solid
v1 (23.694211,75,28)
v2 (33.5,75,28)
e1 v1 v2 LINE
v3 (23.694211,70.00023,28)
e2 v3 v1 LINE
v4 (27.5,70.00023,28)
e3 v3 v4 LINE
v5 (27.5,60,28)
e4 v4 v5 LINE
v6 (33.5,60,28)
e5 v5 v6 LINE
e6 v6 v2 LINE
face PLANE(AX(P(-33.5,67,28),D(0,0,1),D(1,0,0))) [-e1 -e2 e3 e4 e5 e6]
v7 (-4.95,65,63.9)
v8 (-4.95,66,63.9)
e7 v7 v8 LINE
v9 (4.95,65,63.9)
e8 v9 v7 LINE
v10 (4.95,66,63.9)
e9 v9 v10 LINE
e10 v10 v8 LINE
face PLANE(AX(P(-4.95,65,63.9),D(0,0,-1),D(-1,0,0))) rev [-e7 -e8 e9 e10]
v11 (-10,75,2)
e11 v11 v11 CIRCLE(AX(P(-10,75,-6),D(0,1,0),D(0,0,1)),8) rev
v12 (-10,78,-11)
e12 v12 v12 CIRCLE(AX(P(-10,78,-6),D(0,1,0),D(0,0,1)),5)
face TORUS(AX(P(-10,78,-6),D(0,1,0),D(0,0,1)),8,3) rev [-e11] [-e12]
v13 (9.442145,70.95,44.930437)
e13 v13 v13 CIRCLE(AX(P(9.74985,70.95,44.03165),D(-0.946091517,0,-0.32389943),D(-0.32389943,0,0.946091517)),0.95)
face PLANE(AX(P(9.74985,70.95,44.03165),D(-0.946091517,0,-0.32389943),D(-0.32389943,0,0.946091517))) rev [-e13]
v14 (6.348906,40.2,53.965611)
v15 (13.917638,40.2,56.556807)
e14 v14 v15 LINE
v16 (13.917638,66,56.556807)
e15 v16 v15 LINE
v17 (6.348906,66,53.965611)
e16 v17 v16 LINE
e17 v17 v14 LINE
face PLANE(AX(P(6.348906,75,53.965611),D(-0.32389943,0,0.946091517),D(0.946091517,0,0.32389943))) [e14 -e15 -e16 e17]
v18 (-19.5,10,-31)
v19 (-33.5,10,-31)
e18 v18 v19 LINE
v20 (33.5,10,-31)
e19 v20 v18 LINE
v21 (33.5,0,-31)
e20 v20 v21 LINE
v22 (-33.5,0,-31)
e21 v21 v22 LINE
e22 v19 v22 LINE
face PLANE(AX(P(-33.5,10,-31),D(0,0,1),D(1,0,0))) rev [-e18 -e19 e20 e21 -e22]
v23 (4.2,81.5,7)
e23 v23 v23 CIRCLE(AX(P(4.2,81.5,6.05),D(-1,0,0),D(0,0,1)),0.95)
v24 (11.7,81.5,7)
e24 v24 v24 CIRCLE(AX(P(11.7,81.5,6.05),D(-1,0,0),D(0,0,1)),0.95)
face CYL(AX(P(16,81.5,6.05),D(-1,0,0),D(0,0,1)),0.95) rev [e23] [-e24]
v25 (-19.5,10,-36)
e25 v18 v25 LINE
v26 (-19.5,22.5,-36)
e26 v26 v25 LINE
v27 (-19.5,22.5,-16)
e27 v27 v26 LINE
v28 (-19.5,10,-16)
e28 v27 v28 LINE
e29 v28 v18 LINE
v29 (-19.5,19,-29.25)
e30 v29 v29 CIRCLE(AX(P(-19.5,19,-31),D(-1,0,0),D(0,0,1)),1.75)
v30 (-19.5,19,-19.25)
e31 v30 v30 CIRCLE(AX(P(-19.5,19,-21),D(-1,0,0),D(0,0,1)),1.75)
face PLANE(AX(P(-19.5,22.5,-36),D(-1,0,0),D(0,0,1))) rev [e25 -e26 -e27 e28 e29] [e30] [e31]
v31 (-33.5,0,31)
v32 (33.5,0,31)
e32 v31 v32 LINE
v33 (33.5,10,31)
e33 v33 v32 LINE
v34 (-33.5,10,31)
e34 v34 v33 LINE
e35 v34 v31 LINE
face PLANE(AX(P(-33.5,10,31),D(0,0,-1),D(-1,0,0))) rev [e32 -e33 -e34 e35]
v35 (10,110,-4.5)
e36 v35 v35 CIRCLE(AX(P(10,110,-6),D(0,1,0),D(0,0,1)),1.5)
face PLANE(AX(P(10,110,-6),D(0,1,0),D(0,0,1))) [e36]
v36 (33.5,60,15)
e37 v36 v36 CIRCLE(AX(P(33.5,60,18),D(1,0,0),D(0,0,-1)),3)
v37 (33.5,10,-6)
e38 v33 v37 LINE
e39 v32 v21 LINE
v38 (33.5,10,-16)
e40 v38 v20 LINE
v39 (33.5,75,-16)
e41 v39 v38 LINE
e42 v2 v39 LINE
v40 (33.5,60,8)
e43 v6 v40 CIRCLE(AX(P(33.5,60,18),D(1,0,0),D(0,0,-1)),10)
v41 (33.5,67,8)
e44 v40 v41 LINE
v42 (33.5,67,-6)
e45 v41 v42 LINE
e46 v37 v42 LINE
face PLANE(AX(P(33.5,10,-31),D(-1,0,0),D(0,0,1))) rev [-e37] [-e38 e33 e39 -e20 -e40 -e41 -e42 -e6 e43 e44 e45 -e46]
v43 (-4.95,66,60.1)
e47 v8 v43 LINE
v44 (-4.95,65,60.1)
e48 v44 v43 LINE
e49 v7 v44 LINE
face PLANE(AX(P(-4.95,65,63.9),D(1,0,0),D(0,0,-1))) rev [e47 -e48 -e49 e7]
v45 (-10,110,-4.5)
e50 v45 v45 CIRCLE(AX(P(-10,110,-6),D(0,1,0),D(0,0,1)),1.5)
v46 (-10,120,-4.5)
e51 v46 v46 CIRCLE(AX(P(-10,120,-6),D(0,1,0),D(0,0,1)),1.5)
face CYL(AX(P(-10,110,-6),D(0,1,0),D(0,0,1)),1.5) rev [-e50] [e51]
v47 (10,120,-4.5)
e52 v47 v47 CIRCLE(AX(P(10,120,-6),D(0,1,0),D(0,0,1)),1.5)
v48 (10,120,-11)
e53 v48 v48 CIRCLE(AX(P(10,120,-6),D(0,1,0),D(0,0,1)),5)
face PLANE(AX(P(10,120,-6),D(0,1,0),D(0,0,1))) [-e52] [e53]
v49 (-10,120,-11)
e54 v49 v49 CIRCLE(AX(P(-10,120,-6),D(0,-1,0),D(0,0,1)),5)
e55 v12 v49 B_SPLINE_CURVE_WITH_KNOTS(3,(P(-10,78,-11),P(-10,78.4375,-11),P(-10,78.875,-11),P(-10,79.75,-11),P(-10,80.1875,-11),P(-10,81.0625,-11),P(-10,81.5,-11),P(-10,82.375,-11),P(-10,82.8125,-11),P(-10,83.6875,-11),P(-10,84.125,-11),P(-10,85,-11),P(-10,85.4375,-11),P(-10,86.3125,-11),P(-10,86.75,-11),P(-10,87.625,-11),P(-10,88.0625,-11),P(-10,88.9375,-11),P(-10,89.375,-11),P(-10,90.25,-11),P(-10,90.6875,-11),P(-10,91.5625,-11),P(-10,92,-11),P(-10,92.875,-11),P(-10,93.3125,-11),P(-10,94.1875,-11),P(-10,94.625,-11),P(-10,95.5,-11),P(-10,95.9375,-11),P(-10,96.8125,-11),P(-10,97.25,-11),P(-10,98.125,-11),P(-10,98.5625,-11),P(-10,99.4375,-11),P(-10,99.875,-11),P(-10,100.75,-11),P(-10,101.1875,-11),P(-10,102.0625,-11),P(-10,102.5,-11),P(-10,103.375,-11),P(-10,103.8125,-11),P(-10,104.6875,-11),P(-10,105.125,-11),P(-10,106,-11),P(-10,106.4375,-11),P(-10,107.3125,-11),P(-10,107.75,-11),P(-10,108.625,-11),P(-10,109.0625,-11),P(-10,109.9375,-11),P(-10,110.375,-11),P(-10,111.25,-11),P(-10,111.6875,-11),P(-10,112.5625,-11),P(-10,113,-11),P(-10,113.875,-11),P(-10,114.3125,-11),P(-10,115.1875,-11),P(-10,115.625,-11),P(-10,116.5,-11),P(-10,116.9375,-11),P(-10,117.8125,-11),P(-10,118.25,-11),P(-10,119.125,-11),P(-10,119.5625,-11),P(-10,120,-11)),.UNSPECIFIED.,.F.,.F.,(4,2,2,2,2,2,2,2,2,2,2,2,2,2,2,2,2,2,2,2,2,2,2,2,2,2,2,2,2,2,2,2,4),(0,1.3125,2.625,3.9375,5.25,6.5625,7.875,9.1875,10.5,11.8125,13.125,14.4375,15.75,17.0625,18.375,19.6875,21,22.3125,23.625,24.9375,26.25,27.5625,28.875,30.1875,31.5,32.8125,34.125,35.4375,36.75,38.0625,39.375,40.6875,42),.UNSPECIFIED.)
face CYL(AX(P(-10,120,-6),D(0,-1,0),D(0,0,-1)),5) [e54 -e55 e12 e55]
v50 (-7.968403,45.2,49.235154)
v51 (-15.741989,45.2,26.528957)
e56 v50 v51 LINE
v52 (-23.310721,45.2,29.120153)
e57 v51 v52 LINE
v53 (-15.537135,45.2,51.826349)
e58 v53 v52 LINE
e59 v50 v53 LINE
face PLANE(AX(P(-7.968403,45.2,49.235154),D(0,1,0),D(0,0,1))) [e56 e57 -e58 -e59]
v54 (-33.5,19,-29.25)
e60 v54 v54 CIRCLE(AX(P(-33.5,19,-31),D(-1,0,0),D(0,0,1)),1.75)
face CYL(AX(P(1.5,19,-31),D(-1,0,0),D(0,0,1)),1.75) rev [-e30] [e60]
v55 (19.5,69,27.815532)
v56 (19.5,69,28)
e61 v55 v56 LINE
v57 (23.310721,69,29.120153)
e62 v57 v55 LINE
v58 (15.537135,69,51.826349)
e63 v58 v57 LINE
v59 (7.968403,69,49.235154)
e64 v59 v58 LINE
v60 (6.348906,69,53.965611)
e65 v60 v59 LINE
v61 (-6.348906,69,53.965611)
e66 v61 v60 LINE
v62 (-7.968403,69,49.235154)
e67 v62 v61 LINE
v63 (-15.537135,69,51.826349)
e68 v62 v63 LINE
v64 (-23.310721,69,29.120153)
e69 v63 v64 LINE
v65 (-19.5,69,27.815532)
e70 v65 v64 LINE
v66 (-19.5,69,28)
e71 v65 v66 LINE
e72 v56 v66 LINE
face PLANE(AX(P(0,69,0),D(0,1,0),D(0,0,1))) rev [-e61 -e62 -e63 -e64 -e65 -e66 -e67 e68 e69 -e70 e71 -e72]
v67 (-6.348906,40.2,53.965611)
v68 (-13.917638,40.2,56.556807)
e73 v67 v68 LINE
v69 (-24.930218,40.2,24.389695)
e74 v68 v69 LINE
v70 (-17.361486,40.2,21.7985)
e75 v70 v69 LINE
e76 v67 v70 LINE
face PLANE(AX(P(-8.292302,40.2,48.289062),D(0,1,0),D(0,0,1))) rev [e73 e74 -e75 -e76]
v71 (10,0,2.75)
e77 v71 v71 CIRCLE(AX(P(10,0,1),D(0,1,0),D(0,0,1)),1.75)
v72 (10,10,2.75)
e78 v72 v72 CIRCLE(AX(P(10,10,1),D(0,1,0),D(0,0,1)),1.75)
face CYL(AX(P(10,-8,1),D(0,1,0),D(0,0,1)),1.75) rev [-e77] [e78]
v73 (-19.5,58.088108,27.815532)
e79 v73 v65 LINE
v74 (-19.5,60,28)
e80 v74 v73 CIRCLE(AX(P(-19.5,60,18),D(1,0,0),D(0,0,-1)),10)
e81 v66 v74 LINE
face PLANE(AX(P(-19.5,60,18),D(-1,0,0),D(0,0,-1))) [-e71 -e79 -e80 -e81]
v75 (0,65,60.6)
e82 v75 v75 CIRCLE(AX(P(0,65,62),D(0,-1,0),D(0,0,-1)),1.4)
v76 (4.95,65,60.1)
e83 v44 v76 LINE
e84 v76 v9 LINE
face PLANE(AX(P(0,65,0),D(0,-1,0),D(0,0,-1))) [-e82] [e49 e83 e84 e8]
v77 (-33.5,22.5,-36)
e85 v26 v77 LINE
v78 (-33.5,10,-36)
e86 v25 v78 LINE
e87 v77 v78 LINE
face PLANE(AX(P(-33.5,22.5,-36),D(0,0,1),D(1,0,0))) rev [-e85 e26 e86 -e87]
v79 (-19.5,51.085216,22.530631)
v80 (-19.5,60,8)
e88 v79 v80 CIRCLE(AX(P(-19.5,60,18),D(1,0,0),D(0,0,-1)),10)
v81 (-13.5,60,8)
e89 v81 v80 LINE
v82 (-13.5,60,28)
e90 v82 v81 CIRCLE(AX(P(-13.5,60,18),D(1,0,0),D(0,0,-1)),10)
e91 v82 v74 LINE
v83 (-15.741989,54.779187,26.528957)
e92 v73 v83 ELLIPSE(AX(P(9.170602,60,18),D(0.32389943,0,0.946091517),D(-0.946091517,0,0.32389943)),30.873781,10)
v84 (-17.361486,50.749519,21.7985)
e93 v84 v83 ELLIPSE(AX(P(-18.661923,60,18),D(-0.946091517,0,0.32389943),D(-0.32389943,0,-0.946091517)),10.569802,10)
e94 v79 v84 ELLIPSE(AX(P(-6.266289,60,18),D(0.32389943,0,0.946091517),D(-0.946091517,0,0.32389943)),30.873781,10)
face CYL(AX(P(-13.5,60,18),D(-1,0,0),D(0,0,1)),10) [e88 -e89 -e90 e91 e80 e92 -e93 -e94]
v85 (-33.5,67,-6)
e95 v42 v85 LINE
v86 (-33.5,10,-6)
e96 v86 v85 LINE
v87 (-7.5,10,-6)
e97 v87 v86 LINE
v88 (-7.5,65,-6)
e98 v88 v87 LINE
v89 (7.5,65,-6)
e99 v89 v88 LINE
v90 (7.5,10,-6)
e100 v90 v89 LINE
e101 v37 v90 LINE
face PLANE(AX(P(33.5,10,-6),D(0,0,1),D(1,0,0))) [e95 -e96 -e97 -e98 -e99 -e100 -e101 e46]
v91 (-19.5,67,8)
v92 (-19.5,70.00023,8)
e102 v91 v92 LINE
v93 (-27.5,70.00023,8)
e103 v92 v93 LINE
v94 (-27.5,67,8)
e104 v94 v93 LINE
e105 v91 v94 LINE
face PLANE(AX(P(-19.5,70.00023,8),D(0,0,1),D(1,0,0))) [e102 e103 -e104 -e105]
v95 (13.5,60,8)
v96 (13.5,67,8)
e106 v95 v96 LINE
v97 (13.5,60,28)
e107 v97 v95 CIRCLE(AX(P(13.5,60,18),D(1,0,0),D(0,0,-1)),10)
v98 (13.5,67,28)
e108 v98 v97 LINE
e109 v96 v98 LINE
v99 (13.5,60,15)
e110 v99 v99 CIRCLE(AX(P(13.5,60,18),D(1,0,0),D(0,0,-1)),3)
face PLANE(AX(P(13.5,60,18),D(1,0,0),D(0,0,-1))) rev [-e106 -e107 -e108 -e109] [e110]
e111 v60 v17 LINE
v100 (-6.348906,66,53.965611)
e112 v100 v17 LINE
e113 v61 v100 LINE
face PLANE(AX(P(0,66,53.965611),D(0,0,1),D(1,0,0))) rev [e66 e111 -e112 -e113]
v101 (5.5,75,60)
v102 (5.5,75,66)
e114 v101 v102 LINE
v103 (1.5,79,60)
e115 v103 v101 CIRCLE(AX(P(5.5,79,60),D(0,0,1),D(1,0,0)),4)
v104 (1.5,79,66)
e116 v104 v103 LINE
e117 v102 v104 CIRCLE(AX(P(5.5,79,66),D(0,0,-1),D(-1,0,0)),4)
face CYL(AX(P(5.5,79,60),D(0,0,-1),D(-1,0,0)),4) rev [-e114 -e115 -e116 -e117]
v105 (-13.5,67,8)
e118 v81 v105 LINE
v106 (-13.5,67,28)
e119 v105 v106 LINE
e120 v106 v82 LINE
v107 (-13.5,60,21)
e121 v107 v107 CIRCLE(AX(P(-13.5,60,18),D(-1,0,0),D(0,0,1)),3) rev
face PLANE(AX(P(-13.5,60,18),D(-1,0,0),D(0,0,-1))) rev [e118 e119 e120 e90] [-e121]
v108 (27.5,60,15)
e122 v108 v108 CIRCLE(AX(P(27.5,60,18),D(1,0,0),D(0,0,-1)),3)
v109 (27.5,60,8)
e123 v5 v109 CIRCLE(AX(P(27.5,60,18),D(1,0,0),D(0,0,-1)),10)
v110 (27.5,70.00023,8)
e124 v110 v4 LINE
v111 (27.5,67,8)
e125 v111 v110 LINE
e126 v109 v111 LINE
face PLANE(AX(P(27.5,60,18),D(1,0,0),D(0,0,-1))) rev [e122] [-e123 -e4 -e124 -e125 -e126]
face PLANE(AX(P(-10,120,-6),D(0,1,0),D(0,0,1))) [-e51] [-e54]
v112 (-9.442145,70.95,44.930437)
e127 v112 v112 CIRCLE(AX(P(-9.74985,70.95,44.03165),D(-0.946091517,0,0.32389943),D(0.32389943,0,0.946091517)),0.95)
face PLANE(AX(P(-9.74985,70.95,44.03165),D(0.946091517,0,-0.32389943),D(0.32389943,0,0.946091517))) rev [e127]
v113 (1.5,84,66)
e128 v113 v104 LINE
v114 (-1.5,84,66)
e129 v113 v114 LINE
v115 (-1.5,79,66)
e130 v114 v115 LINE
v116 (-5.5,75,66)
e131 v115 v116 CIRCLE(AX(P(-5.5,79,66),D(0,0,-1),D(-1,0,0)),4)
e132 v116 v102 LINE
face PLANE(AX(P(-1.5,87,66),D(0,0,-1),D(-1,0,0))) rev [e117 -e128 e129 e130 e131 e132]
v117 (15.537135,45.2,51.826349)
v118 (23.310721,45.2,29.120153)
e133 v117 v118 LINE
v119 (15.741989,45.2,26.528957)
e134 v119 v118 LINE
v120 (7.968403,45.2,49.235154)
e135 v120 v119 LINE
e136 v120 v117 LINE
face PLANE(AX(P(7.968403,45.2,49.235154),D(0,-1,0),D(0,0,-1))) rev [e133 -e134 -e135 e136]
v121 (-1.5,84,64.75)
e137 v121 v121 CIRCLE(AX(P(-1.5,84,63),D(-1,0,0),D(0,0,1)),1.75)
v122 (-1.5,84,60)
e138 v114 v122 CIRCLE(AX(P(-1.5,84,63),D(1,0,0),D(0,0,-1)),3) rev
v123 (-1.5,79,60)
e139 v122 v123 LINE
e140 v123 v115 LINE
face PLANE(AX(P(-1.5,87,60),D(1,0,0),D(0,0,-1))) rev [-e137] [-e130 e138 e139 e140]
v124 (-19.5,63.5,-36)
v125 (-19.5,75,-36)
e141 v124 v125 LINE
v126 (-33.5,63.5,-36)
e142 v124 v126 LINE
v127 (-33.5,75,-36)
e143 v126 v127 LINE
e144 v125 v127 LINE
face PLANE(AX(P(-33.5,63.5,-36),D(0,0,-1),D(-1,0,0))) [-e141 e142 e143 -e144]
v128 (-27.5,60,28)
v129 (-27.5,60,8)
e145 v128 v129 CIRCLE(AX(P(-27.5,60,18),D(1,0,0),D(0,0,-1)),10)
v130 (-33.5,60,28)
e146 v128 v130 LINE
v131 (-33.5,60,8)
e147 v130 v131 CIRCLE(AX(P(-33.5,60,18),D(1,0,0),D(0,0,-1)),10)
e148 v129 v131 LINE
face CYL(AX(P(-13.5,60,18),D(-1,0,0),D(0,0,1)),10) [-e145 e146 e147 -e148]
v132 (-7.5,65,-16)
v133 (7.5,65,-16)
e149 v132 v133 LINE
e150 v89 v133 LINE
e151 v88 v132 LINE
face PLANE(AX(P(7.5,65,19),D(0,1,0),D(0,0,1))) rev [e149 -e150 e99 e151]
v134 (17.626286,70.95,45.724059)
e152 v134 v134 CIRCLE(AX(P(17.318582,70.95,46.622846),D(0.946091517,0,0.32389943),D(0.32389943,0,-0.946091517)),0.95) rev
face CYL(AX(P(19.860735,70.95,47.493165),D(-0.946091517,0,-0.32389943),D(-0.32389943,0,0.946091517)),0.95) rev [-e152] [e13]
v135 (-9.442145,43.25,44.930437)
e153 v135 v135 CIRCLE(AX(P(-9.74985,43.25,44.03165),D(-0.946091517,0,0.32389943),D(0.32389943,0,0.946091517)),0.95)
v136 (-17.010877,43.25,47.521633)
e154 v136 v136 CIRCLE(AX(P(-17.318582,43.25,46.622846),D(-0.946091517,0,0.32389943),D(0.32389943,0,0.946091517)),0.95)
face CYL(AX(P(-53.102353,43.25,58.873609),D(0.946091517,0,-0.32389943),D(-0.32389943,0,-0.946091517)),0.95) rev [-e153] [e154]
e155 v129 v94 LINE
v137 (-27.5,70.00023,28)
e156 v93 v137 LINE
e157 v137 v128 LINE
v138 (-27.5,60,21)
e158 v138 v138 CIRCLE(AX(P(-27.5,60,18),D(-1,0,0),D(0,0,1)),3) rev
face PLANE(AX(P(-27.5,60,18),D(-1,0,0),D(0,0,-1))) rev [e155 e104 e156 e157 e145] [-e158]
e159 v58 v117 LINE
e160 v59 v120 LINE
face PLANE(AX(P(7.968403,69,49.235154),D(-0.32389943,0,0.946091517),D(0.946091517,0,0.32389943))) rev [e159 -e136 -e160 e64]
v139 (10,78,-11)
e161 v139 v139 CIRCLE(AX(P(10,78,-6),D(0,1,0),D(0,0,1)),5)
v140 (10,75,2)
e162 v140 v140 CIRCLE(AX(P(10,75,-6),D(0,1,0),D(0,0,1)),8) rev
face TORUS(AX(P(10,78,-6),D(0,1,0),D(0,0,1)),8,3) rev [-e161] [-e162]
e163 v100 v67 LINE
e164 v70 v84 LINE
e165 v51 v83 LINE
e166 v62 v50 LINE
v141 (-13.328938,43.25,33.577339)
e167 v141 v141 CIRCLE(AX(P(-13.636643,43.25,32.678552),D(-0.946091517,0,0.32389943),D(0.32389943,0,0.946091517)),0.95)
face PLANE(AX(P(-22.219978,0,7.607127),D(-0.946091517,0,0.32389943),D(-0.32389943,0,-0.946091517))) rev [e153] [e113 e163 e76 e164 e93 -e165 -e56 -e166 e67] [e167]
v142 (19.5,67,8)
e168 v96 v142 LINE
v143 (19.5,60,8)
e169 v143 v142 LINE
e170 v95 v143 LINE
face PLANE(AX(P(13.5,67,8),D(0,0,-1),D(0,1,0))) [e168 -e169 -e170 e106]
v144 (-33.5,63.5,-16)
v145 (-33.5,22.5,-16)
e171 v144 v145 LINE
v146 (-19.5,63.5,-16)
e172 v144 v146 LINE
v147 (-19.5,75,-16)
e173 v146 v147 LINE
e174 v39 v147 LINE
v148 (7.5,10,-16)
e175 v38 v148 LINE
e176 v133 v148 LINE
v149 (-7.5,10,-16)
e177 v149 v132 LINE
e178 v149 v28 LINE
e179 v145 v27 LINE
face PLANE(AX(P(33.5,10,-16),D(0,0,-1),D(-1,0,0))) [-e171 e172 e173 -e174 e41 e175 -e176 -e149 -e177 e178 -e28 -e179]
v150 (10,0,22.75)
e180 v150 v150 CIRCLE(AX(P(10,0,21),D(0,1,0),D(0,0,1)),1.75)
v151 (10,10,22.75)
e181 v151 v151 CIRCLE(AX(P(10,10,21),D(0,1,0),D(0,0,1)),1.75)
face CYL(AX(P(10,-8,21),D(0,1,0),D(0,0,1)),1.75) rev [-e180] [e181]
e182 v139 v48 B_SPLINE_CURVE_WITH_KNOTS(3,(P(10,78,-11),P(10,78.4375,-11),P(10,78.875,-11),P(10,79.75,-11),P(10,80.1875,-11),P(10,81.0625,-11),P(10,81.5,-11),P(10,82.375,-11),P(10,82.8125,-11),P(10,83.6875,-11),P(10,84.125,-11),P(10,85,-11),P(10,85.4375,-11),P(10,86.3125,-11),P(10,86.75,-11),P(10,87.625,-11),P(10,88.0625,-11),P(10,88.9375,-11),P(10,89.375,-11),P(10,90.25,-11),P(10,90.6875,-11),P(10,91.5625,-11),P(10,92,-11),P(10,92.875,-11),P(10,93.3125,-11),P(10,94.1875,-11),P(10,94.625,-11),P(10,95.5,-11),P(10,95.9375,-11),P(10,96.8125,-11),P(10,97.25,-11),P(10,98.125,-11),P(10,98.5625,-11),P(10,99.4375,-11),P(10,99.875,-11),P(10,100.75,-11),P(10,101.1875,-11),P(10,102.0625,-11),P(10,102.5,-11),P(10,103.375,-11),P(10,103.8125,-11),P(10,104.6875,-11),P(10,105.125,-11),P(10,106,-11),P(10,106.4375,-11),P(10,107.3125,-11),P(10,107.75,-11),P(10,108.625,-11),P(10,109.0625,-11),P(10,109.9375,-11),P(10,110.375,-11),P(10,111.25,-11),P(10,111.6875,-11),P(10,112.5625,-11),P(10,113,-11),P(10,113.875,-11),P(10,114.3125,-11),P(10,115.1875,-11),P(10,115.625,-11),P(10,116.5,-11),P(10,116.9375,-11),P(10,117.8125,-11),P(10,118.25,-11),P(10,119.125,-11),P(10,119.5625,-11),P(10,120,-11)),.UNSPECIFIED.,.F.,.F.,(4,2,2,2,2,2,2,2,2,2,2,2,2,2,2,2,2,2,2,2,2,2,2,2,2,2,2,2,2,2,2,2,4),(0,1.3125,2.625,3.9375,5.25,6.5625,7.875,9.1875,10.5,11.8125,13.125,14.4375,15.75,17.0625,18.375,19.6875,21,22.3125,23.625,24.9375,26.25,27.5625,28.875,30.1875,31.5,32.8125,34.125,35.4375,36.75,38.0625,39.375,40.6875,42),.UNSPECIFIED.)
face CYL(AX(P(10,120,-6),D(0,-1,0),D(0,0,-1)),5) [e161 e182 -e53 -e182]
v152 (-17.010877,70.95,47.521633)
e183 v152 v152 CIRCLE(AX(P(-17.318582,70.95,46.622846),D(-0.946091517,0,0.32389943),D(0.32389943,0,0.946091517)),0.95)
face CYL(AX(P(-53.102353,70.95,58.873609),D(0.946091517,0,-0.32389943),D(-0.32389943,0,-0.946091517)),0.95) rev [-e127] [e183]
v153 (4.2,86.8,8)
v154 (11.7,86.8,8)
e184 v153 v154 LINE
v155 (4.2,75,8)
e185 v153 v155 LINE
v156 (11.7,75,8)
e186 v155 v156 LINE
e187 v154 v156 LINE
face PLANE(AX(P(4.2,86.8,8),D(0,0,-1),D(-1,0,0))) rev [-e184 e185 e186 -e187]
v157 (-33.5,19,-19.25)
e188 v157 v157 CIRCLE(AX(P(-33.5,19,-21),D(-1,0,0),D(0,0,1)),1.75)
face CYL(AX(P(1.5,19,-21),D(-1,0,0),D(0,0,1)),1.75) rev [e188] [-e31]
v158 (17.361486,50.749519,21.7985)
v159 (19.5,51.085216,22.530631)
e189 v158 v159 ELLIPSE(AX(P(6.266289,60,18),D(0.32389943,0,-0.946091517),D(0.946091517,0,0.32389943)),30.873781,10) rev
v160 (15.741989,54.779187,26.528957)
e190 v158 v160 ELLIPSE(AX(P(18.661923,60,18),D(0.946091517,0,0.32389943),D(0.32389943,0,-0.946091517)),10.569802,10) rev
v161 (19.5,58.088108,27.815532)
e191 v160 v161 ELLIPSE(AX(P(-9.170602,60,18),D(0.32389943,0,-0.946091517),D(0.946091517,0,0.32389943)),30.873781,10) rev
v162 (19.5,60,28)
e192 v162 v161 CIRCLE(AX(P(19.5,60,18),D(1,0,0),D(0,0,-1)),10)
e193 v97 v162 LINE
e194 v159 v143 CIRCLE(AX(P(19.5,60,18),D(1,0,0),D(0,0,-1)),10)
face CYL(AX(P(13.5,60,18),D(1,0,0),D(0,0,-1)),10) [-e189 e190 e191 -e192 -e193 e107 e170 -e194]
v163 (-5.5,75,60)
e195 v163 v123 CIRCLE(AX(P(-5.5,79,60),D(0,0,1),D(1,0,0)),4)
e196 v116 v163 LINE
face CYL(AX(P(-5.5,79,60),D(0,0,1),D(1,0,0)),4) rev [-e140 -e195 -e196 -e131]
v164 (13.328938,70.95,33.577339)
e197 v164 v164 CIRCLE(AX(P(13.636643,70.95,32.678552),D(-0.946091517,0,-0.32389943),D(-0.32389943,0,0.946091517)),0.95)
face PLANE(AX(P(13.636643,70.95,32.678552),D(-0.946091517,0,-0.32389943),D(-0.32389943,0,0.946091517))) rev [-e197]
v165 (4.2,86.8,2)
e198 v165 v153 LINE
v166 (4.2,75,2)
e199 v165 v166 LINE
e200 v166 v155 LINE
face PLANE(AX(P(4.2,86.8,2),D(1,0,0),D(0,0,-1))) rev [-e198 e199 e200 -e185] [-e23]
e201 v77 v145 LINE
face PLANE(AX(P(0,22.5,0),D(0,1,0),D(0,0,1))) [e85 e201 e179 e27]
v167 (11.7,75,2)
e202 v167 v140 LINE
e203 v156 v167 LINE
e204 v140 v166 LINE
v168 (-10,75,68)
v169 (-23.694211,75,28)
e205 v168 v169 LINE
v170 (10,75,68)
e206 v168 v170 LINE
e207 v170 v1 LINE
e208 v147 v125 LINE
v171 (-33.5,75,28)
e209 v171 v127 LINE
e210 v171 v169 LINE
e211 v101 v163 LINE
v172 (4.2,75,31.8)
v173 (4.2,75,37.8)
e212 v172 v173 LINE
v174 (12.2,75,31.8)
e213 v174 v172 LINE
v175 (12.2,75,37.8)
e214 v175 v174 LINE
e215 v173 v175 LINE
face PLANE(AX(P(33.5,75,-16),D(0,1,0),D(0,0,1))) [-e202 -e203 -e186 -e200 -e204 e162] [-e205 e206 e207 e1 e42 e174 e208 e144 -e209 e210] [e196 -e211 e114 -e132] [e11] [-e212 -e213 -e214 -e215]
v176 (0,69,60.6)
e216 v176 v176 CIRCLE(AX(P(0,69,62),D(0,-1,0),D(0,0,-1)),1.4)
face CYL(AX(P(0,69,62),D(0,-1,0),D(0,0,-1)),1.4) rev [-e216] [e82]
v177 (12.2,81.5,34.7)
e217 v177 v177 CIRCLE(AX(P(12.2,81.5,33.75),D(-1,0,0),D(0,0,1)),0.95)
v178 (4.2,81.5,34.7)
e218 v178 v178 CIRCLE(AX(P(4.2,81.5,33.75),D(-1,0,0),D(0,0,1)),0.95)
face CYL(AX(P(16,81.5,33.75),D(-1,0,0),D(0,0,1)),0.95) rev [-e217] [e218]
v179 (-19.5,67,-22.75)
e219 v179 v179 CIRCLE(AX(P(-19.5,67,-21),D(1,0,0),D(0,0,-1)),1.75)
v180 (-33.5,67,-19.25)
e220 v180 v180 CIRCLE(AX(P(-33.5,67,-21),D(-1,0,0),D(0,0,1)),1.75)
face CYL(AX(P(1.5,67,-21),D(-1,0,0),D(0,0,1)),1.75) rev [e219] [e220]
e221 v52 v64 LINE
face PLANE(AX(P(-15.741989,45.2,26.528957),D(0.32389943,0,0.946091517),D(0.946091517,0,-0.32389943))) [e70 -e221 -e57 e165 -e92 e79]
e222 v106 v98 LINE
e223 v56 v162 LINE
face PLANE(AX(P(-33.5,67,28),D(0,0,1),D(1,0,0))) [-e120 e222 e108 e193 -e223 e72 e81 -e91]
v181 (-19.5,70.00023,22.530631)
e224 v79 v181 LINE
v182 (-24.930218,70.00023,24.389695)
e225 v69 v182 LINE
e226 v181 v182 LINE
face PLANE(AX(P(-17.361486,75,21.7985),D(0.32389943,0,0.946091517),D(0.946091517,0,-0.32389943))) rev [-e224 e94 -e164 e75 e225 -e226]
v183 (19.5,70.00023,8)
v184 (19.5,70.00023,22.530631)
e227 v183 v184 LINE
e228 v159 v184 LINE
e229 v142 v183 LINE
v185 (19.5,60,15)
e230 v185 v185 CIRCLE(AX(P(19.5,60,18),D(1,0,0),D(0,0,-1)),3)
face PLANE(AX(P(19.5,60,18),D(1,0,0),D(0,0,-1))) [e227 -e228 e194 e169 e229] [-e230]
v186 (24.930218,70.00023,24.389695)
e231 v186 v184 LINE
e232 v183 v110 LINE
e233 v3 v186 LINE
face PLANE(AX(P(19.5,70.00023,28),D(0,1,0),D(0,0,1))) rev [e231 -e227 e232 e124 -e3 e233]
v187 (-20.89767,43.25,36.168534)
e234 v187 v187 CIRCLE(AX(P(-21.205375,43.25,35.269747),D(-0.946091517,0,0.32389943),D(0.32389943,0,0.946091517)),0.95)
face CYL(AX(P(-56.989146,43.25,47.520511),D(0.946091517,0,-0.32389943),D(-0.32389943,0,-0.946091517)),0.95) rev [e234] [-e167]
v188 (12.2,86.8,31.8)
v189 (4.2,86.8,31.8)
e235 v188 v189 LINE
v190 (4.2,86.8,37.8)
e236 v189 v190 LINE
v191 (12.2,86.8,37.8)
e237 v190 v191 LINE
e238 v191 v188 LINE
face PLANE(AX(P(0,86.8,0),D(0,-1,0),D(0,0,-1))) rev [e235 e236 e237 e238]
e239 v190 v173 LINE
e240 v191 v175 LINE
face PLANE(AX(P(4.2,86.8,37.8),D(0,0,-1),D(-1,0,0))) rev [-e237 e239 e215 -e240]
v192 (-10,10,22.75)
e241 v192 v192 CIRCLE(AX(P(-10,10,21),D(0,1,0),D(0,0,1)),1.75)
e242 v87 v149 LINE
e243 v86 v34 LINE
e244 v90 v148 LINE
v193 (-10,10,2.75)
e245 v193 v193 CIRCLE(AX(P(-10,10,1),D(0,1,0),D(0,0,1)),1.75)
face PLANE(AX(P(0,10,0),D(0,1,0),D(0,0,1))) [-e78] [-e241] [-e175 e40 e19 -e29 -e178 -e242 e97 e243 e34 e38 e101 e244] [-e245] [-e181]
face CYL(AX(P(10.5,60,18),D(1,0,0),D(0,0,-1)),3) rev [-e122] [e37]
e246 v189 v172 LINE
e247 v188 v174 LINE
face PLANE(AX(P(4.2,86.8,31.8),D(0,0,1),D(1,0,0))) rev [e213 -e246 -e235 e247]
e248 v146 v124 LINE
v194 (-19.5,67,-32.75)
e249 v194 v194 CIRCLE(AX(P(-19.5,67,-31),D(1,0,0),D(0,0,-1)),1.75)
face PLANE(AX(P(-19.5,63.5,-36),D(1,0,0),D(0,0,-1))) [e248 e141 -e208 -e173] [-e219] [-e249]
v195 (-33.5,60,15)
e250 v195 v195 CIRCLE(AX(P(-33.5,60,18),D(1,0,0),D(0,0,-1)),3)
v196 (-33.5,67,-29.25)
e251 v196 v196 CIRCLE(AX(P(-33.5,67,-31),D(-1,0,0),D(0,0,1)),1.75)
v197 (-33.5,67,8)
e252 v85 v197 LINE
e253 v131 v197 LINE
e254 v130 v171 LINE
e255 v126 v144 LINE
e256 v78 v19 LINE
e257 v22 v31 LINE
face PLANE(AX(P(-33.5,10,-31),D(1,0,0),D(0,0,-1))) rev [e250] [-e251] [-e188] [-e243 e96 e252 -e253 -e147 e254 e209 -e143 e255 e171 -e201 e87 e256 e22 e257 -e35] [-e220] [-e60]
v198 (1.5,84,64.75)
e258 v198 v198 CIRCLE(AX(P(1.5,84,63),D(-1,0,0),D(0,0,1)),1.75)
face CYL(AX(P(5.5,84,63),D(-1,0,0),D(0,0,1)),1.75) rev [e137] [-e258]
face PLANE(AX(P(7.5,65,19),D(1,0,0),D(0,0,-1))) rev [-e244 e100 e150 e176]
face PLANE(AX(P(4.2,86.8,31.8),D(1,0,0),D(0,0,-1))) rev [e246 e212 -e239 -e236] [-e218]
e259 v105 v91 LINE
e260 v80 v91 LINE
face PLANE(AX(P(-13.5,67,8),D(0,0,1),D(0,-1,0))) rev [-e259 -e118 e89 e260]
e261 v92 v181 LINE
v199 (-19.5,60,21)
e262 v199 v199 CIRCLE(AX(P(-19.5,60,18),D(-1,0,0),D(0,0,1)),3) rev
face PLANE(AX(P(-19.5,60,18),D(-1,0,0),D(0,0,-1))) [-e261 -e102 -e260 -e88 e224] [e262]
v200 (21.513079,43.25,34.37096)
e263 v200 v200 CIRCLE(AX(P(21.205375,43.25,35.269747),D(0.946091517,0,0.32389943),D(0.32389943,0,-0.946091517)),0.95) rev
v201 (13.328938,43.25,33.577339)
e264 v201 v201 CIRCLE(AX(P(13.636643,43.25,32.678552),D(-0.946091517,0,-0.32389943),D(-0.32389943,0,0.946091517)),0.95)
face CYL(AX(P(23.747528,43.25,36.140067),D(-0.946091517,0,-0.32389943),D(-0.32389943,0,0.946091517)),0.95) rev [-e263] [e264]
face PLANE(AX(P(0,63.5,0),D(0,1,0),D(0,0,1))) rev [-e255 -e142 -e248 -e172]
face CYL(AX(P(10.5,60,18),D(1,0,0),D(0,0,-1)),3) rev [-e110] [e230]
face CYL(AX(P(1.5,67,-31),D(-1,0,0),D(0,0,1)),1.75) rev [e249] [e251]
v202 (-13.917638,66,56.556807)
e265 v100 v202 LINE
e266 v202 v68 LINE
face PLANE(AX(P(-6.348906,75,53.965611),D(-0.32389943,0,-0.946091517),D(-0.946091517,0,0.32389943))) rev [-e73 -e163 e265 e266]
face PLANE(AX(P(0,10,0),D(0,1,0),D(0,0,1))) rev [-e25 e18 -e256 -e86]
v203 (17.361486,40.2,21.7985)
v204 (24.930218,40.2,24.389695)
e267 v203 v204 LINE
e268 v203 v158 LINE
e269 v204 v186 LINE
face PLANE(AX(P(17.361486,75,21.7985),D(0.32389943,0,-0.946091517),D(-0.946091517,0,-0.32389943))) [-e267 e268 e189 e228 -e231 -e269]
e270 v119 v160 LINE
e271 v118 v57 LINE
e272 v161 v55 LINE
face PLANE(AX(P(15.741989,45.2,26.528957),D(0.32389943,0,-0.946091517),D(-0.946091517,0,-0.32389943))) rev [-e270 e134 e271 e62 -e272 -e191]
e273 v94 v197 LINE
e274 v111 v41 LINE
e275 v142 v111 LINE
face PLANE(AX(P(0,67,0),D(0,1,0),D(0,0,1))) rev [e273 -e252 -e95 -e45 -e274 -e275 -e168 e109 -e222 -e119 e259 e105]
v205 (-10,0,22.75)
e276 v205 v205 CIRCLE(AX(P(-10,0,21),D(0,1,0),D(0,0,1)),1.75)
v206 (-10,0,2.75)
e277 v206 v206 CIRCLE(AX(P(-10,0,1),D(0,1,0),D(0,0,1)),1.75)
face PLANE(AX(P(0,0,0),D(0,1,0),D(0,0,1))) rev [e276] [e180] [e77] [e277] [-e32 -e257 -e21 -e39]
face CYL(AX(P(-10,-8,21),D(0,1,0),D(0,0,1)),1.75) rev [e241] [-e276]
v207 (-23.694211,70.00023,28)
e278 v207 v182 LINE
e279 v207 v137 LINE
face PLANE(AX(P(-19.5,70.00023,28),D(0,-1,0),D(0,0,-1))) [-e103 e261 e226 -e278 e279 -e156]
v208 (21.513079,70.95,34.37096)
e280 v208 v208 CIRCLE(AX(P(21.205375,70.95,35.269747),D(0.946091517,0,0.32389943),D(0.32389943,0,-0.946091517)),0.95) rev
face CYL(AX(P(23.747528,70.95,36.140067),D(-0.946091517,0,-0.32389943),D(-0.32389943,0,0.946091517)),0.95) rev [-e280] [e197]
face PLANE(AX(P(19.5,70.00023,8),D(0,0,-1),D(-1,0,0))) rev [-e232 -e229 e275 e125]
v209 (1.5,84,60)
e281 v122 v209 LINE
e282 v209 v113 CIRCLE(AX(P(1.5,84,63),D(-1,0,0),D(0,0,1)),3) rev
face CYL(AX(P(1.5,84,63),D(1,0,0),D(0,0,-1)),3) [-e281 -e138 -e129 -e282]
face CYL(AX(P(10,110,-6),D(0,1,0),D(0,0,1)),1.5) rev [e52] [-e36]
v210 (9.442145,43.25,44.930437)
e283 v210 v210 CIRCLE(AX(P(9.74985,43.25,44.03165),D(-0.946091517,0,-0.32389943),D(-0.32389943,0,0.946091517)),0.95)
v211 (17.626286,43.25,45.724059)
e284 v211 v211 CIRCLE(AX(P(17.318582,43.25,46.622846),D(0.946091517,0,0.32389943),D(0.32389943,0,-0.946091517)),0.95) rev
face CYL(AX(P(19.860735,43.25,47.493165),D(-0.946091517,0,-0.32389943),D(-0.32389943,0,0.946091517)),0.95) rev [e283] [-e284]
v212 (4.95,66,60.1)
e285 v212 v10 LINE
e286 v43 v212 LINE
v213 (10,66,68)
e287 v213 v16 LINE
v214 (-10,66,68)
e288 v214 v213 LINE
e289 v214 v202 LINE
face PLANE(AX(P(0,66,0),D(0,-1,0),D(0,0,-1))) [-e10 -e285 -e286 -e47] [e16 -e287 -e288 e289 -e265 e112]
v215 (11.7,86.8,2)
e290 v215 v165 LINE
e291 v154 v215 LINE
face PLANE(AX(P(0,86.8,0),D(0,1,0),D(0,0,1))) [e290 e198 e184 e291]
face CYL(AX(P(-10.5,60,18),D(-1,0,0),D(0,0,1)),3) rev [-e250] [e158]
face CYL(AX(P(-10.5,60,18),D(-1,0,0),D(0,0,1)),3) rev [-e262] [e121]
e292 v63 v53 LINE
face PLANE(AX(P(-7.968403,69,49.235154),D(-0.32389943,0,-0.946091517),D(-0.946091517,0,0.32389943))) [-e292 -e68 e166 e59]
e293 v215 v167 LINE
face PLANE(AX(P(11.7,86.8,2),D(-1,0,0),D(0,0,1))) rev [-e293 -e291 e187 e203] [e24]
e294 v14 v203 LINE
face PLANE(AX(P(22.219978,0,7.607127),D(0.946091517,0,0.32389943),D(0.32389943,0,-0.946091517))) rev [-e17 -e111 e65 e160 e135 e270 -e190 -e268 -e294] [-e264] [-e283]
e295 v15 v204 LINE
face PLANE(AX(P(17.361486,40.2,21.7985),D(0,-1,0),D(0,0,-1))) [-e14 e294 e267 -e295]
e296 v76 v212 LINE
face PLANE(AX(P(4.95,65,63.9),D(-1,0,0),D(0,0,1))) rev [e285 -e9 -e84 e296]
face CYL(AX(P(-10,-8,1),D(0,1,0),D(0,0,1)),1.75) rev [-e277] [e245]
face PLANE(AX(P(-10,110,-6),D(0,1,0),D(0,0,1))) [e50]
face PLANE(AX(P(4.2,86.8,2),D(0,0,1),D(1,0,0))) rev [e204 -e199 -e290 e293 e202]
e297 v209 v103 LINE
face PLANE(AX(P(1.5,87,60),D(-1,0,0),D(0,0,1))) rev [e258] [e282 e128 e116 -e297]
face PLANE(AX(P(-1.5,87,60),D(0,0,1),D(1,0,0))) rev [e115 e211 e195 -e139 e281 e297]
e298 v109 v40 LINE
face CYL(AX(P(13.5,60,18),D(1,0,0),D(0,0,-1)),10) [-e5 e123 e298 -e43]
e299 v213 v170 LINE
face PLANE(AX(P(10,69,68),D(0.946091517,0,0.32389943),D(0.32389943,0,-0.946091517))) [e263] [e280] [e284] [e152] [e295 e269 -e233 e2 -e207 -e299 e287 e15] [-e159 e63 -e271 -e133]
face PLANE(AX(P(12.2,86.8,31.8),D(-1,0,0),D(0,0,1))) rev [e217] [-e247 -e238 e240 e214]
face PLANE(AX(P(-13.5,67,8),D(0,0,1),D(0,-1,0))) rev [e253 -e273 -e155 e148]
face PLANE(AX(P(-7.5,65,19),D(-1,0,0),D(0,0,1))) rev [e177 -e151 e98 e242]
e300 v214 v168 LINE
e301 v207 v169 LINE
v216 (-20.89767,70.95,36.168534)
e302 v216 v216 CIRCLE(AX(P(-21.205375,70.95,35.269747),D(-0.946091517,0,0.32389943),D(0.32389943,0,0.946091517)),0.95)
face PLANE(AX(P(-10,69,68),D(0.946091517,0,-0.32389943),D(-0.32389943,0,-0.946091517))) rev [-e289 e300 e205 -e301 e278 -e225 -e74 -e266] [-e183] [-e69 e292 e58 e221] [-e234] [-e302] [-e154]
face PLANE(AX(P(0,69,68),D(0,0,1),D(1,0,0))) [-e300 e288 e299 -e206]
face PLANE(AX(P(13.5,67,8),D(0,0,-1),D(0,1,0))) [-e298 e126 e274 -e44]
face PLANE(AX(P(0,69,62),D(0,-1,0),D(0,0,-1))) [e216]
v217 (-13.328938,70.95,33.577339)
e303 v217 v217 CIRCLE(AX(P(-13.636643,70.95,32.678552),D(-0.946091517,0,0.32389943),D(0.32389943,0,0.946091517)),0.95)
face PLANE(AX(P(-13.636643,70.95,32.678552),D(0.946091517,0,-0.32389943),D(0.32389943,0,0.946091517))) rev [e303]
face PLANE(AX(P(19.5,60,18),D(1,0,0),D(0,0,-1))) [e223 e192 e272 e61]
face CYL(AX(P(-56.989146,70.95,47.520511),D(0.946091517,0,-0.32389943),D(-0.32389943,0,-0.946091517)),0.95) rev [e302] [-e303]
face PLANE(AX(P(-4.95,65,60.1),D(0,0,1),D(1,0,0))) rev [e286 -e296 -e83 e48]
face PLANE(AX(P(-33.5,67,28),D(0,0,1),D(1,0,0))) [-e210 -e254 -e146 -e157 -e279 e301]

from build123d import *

# Parameters (mm, degrees)
SKETCH_1_W             = 67
SKETCH_1_H             = 62
EXTRUDE_1_DEPTH        = 10
SKETCH_3_W             = 14
SKETCH_3_H             = 20
EXTRUDE_2_DEPTH        = 12.5
SKETCH_4_W             = 10
SKETCH_4_H             = 65
EXTRUDE_3_DEPTH        = 67
SKETCH_5_W             = 67
SKETCH_5_H             = 44
EXTRUDE_4_DEPTH        = 8
EXTRUDE_5_DEPTH        = 20
CUT_EXTRUDE_START      = -6
CUT_EXTRUDE_1_DEPTH    = 8
EXTRUDE_6_DEPTH        = 6
SKETCH_9_R             = 3
CUT_EXTRUDE_2_DEPTH    = 23
SKETCH_10_W            = 24
SKETCH_10_H            = 23.8
EXTRUDE_7_DEPTH        = 8
SKETCH_12_W            = 14
SKETCH_12_H            = 20
EXTRUDE_8_DEPTH        = 11.5
SKETCH_13_R            = 0.95
CUT_EXTRUDE_4_DEPTH    = 8
SKETCH_14_W            = 7.5
SKETCH_14_H            = 6
SKETCH_14_W_2          = 8
EXTRUDE_9_DEPTH        = 11.8
SKETCH_15_R            = 0.95
CUT_EXTRUDE_5_DEPTH    = 11.8
SKETCH_16_W            = 3
SKETCH_16_H            = 6
EXTRUDE_10_DEPTH       = 12
FILLET_1_RADIUS        = 3
FILLET_1_LENGTH        = 3
SKETCH_17_R            = 1.75
CUT_EXTRUDE_6_DEPTH    = 7
SKETCH_18_R            = 5
EXTRUDE_11_DEPTH       = 45
FILLET_2_R             = 3
FILLET_2_OF_MIRROR_1_R = 3
SKETCH_20_R            = 1.75
CUT_EXTRUDE_7_DEPTH    = 35
SKETCH_21_W            = 15
SKETCH_21_H            = 55
CUT_EXTRUDE_8_DEPTH    = 35
SKETCH_24_R            = 1.75
CUT_EXTRUDE_11_DEPTH   = 18
SKETCH_25_R            = 1.5
CUT_EXTRUDE_12_DEPTH   = 10
FILLET_3_R             = 4
EXTRUDE_12_DEPTH       = 3
SKETCH_27_W            = 9.9
SKETCH_27_H            = 3.8
EXTRUDE_13_DEPTH       = 1
SKETCH_29_R            = 1.4
CUT_EXTRUDE_13_DEPTH   = 4


with BuildPart() as part:
    # 草图1 → 凸台-拉伸1 (new body)
    with BuildSketch(Plane(origin=(0, 0, 0), x_dir=(1, 0, 0), z_dir=(0, 1, 0))):
        Rectangle(SKETCH_1_W, SKETCH_1_H)
    extrude(amount=EXTRUDE_1_DEPTH)

    # 草图3 → 凸台-拉伸2 (add)
    with BuildSketch(Plane(origin=(0, 10, 0), x_dir=(1, 0, 0), z_dir=(0, 1, 0))):
        with Locations((-26.5, 26)):
            Rectangle(SKETCH_3_W, SKETCH_3_H)
    extrude(amount=EXTRUDE_2_DEPTH)

    # 草图4 → 凸台-拉伸3 (add)
    with BuildSketch(Plane.ZY.offset(33.5)):
        with Locations((-11, 42.5)):
            Rectangle(SKETCH_4_W, SKETCH_4_H)
    extrude(amount=-EXTRUDE_3_DEPTH)

    # 草图5 → 凸台-拉伸4 (add)
    with BuildSketch(Plane(origin=(0, 75, 0), x_dir=(1, 0, 0), z_dir=(0, 1, 0))):
        with Locations((0, -6)):
            Rectangle(SKETCH_5_W, SKETCH_5_H)
    extrude(amount=-EXTRUDE_4_DEPTH)

    # 草图6 → 凸台-拉伸5 (add)
    with BuildSketch(Plane(origin=(33.5, 0, 0), x_dir=(0, 0, -1), z_dir=(1, 0, 0))):
        with BuildLine():
            Line((-28, 60), (-28, 67))
            Line((-28, 67), (-8, 67))
            Line((-8, 67), (-8, 60))
            ThreePointArc((-8, 60), (-18, 50), (-28, 60))
        make_face()
    extrude_5 = extrude(amount=-EXTRUDE_5_DEPTH)

    # 草图7 → 切除-拉伸1 (cut)
    with BuildSketch(Plane(origin=(33.5, 0, 0), x_dir=(0, 0, -1), z_dir=(1, 0, 0)).offset(CUT_EXTRUDE_START)):
        with BuildLine():
            Line((-28, 60), (-28, 70.000230089))
            Line((-28, 70.000230089), (-8, 70.000230089))
            Line((-8, 70.000230089), (-8, 60))
            ThreePointArc((-8, 60), (-18, 50), (-28, 60))
        make_face()
    cut_extrude_1 = extrude(amount=-CUT_EXTRUDE_1_DEPTH, mode=Mode.SUBTRACT)

    # 草图8 → 凸台-拉伸6 (add)
    with BuildSketch(Plane(origin=(0, 75, 0), x_dir=(1, 0, 0), z_dir=(0, 1, 0))):
        Polygon((0, -68), (10, -68), (23.694211345, -28), (0, -28), align=None)
    extrude_6 = extrude(amount=-EXTRUDE_6_DEPTH)

    # 草图9 → 切除-拉伸2 (cut)
    with BuildSketch(Plane(origin=(33.5, 0, 0), x_dir=(0, 0, -1), z_dir=(1, 0, 0))):
        with Locations((-18, 60)):
            Circle(SKETCH_9_R)
    cut_extrude_2 = extrude(amount=-CUT_EXTRUDE_2_DEPTH, mode=Mode.SUBTRACT)

    # 草图10 → 凸台-拉伸7 (add)
    with BuildSketch(Plane(origin=(29.7887098, 0, 10.198322192), x_dir=(0.32389942978753467, 0, -0.9460915174460186), z_dir=(0.9460915174460186, 0, 0.32389942978753467))):
        Polygon((-44, 75), (-15, 75), (-15, 40.2), (-43, 40.2), (-49, 40.2), (-49, 75), align=None)
        with Locations((-32, 57.1)):
            Rectangle(SKETCH_10_W, SKETCH_10_H, mode=Mode.SUBTRACT)
    extrude_7 = extrude(amount=-EXTRUDE_7_DEPTH)

    # 草图12 → 凸台-拉伸8 (add)
    with BuildSketch(Plane(origin=(0, 75, 0), x_dir=(1, 0, 0), z_dir=(0, 1, 0))):
        with Locations((-26.5, 26)):
            Rectangle(SKETCH_12_W, SKETCH_12_H)
    extrude(amount=-EXTRUDE_8_DEPTH)

    # 草图13 → 切除-拉伸4 (cut)
    with BuildSketch(Plane(origin=(22.21997766, 0, 7.607126754), x_dir=(-0.3238994297875346, 0, 0.9460915174460185), z_dir=(-0.9460915174460185, 0, -0.3238994297875346))):
        with Locations((38.5, 70.95)):
            Circle(SKETCH_13_R)
        with Locations((26.5, 70.95)):
            Circle(SKETCH_13_R)
        with Locations((26.5, 43.25)):
            Circle(SKETCH_13_R)
        with Locations((38.5, 43.25)):
            Circle(SKETCH_13_R)
    cut_extrude_4 = extrude(amount=-CUT_EXTRUDE_4_DEPTH, mode=Mode.SUBTRACT)

    # 草图14 → 凸台-拉伸9 (add)
    with BuildSketch(Plane(origin=(0, 75, 0), x_dir=(1, 0, 0), z_dir=(0, 1, 0))):
        with Locations((7.95, -5)):
            Rectangle(SKETCH_14_W, SKETCH_14_H)
        with Locations((8.2, -34.8)):
            Rectangle(SKETCH_14_W_2, SKETCH_14_H)
    extrude(amount=EXTRUDE_9_DEPTH)

    # 草图15 → 切除-拉伸5 (cut)
    with BuildSketch(Plane.ZY.offset(-4.2)):
        with Locations((33.75, 81.5)):
            Circle(SKETCH_15_R)
        with Locations((6.05, 81.5)):
            Circle(SKETCH_15_R)
    extrude(amount=-CUT_EXTRUDE_5_DEPTH, mode=Mode.SUBTRACT)

    # 草图16 → 凸台-拉伸10 (add)
    with BuildSketch(Plane(origin=(0, 75, 0), x_dir=(1, 0, 0), z_dir=(0, 1, 0))):
        with Locations((0, -63)):
            Rectangle(SKETCH_16_W, SKETCH_16_H)
    extrude(amount=EXTRUDE_10_DEPTH)

    # 圆角1: full round fillet: the end face becomes a half cylinder, R = half its width
    fillet_1_face = Plane((0, 87, 63), x_dir=(1, 0, 0), z_dir=(0, 1, 0))  # on the end face: x along it, z out of the body
    fillet_1_slab = fillet_1_face.offset(-FILLET_1_RADIUS / 2) * Box(FILLET_1_LENGTH, 2 * FILLET_1_RADIUS, FILLET_1_RADIUS, mode=Mode.PRIVATE)  # the body's end, R deep
    fillet_1_round = Plane((0, 84, 63), x_dir=(0, 1, 0), z_dir=(1, 0, 0)) * Cylinder(FILLET_1_RADIUS, FILLET_1_LENGTH, mode=Mode.PRIVATE)  # its axis R under the face
    add(fillet_1_slab - fillet_1_round, mode=Mode.SUBTRACT)

    # 草图17 → 切除-拉伸6 (cut)
    with BuildSketch(Plane.ZY.offset(1.5)):
        with Locations((63, 84)):
            Circle(SKETCH_17_R)
    extrude(amount=-CUT_EXTRUDE_6_DEPTH, mode=Mode.SUBTRACT)

    # 草图18 → 凸台-拉伸11 (add)
    with BuildSketch(Plane(origin=(0, 75, 0), x_dir=(1, 0, 0), z_dir=(0, 1, 0))):
        with Locations(Location((10, 6, 0), (0, 0, 90))):
            Circle(SKETCH_18_R)
    extrude_11 = extrude(amount=EXTRUDE_11_DEPTH)

    # 圆角2
    fillet_2_edges = [part.edges().sort_by_distance(p)[0] for p in [
        (10, 75, -1),
    ]]
    fillet(fillet_2_edges, radius=FILLET_2_R - 0.0001)  # a hair under: the kernel refuses the full size

    # 镜向1: 凸台-拉伸5, 切除-拉伸1, 凸台-拉伸6, 切除-拉伸2, 凸台-拉伸7, 切除-拉伸4, 凸台-拉伸11 across plane
    add(extrude_5.mirror(Plane(origin=(0, 0, 0), x_dir=(0, 0, 1), z_dir=(1, 0, 0))))
    add(cut_extrude_1.mirror(Plane(origin=(0, 0, 0), x_dir=(0, 0, 1), z_dir=(1, 0, 0))), mode=Mode.SUBTRACT)
    add(extrude_6.mirror(Plane(origin=(0, 0, 0), x_dir=(0, 0, 1), z_dir=(1, 0, 0))))
    add(cut_extrude_2.mirror(Plane(origin=(0, 0, 0), x_dir=(0, 0, 1), z_dir=(1, 0, 0))), mode=Mode.SUBTRACT)
    add(extrude_7.mirror(Plane(origin=(0, 0, 0), x_dir=(0, 0, 1), z_dir=(1, 0, 0))))
    add(cut_extrude_4.mirror(Plane(origin=(0, 0, 0), x_dir=(0, 0, 1), z_dir=(1, 0, 0))), mode=Mode.SUBTRACT)
    add(extrude_11.mirror(Plane(origin=(0, 0, 0), x_dir=(0, 0, 1), z_dir=(1, 0, 0))))

    # 圆角2 of 镜向1
    fillet_2_of_mirror_1_edges = [part.edges().sort_by_distance(p)[0] for p in [
        (-10, 75, -1),
    ]]
    fillet(fillet_2_of_mirror_1_edges, radius=FILLET_2_OF_MIRROR_1_R - 0.0001)  # a hair under: the kernel refuses the full size

    # 草图20 → 切除-拉伸7 (cut)
    with BuildSketch(Plane.ZY.offset(33.5)):
        with Locations((-31, 67)):
            Circle(SKETCH_20_R)
        with Locations((-21, 67)):
            Circle(SKETCH_20_R)
        with Locations((-31, 19)):
            Circle(SKETCH_20_R)
        with Locations((-21, 19)):
            Circle(SKETCH_20_R)
    extrude(amount=-CUT_EXTRUDE_7_DEPTH, mode=Mode.SUBTRACT)

    # 草图21 → 切除-拉伸8 (cut)
    with BuildSketch(Plane(origin=(0, 0, -16), x_dir=(-1, 0, 0), z_dir=(0, 0, -1))):
        with Locations((0, 37.5)):
            Rectangle(SKETCH_21_W, SKETCH_21_H)
    extrude(amount=-CUT_EXTRUDE_8_DEPTH, mode=Mode.SUBTRACT)

    # 草图24 → 切除-拉伸11 (cut)
    with BuildSketch(Plane(origin=(0, 10, 0), x_dir=(1, 0, 0), z_dir=(0, 1, 0))):
        with Locations(Location((-10, -21, 0), (0, 0, 270))):
            Circle(SKETCH_24_R)
        with Locations(Location((10, -21, 0), (0, 0, 270))):
            Circle(SKETCH_24_R)
        with Locations(Location((-10, -1, 0), (0, 0, 270))):
            Circle(SKETCH_24_R)
        with Locations(Location((10, -1, 0), (0, 0, 270))):
            Circle(SKETCH_24_R)
    extrude(amount=-CUT_EXTRUDE_11_DEPTH, mode=Mode.SUBTRACT)

    # 草图25 → 切除-拉伸12 (cut)
    with BuildSketch(Plane(origin=(0, 120, 0), x_dir=(1, 0, 0), z_dir=(0, 1, 0))):
        with Locations(Location((10, 6, 0), (0, 0, 270))):
            Circle(SKETCH_25_R)
        with Locations(Location((-10, 6, 0), (0, 0, 270))):
            Circle(SKETCH_25_R)
    extrude(amount=-CUT_EXTRUDE_12_DEPTH, mode=Mode.SUBTRACT)

    # 圆角3
    fillet_3_edges = [part.edges().sort_by_distance(p)[0] for p in [
        (-1.5, 75, 63),
        (1.5, 75, 63),
    ]]
    fillet(fillet_3_edges, radius=FILLET_3_R)

    # 草图26 → 凸台-拉伸12 (add)
    with BuildSketch(Plane.XZ.offset(-69)):
        Polygon((-6.348905601, 53.965611109), (6.348905601, 53.965611109), (13.91763774, 56.556806547), (10, 68), (-10, 68), (-13.91763774, 56.556806547), align=None)
    extrude(amount=EXTRUDE_12_DEPTH)

    # 草图27 → 凸台-拉伸13 (add)
    with BuildSketch(Plane.XZ.offset(-66)):
        with Locations((0, 62)):
            Rectangle(SKETCH_27_W, SKETCH_27_H)
    extrude(amount=EXTRUDE_13_DEPTH)

    # 草图29 → 切除-拉伸13 (cut)
    with BuildSketch(Plane.XZ.offset(-65)):
        with Locations(Location((0, 62, 0), (0, 0, 270))):
            Circle(SKETCH_29_R)
    extrude(amount=-CUT_EXTRUDE_13_DEPTH, mode=Mode.SUBTRACT)


solid = part.part
